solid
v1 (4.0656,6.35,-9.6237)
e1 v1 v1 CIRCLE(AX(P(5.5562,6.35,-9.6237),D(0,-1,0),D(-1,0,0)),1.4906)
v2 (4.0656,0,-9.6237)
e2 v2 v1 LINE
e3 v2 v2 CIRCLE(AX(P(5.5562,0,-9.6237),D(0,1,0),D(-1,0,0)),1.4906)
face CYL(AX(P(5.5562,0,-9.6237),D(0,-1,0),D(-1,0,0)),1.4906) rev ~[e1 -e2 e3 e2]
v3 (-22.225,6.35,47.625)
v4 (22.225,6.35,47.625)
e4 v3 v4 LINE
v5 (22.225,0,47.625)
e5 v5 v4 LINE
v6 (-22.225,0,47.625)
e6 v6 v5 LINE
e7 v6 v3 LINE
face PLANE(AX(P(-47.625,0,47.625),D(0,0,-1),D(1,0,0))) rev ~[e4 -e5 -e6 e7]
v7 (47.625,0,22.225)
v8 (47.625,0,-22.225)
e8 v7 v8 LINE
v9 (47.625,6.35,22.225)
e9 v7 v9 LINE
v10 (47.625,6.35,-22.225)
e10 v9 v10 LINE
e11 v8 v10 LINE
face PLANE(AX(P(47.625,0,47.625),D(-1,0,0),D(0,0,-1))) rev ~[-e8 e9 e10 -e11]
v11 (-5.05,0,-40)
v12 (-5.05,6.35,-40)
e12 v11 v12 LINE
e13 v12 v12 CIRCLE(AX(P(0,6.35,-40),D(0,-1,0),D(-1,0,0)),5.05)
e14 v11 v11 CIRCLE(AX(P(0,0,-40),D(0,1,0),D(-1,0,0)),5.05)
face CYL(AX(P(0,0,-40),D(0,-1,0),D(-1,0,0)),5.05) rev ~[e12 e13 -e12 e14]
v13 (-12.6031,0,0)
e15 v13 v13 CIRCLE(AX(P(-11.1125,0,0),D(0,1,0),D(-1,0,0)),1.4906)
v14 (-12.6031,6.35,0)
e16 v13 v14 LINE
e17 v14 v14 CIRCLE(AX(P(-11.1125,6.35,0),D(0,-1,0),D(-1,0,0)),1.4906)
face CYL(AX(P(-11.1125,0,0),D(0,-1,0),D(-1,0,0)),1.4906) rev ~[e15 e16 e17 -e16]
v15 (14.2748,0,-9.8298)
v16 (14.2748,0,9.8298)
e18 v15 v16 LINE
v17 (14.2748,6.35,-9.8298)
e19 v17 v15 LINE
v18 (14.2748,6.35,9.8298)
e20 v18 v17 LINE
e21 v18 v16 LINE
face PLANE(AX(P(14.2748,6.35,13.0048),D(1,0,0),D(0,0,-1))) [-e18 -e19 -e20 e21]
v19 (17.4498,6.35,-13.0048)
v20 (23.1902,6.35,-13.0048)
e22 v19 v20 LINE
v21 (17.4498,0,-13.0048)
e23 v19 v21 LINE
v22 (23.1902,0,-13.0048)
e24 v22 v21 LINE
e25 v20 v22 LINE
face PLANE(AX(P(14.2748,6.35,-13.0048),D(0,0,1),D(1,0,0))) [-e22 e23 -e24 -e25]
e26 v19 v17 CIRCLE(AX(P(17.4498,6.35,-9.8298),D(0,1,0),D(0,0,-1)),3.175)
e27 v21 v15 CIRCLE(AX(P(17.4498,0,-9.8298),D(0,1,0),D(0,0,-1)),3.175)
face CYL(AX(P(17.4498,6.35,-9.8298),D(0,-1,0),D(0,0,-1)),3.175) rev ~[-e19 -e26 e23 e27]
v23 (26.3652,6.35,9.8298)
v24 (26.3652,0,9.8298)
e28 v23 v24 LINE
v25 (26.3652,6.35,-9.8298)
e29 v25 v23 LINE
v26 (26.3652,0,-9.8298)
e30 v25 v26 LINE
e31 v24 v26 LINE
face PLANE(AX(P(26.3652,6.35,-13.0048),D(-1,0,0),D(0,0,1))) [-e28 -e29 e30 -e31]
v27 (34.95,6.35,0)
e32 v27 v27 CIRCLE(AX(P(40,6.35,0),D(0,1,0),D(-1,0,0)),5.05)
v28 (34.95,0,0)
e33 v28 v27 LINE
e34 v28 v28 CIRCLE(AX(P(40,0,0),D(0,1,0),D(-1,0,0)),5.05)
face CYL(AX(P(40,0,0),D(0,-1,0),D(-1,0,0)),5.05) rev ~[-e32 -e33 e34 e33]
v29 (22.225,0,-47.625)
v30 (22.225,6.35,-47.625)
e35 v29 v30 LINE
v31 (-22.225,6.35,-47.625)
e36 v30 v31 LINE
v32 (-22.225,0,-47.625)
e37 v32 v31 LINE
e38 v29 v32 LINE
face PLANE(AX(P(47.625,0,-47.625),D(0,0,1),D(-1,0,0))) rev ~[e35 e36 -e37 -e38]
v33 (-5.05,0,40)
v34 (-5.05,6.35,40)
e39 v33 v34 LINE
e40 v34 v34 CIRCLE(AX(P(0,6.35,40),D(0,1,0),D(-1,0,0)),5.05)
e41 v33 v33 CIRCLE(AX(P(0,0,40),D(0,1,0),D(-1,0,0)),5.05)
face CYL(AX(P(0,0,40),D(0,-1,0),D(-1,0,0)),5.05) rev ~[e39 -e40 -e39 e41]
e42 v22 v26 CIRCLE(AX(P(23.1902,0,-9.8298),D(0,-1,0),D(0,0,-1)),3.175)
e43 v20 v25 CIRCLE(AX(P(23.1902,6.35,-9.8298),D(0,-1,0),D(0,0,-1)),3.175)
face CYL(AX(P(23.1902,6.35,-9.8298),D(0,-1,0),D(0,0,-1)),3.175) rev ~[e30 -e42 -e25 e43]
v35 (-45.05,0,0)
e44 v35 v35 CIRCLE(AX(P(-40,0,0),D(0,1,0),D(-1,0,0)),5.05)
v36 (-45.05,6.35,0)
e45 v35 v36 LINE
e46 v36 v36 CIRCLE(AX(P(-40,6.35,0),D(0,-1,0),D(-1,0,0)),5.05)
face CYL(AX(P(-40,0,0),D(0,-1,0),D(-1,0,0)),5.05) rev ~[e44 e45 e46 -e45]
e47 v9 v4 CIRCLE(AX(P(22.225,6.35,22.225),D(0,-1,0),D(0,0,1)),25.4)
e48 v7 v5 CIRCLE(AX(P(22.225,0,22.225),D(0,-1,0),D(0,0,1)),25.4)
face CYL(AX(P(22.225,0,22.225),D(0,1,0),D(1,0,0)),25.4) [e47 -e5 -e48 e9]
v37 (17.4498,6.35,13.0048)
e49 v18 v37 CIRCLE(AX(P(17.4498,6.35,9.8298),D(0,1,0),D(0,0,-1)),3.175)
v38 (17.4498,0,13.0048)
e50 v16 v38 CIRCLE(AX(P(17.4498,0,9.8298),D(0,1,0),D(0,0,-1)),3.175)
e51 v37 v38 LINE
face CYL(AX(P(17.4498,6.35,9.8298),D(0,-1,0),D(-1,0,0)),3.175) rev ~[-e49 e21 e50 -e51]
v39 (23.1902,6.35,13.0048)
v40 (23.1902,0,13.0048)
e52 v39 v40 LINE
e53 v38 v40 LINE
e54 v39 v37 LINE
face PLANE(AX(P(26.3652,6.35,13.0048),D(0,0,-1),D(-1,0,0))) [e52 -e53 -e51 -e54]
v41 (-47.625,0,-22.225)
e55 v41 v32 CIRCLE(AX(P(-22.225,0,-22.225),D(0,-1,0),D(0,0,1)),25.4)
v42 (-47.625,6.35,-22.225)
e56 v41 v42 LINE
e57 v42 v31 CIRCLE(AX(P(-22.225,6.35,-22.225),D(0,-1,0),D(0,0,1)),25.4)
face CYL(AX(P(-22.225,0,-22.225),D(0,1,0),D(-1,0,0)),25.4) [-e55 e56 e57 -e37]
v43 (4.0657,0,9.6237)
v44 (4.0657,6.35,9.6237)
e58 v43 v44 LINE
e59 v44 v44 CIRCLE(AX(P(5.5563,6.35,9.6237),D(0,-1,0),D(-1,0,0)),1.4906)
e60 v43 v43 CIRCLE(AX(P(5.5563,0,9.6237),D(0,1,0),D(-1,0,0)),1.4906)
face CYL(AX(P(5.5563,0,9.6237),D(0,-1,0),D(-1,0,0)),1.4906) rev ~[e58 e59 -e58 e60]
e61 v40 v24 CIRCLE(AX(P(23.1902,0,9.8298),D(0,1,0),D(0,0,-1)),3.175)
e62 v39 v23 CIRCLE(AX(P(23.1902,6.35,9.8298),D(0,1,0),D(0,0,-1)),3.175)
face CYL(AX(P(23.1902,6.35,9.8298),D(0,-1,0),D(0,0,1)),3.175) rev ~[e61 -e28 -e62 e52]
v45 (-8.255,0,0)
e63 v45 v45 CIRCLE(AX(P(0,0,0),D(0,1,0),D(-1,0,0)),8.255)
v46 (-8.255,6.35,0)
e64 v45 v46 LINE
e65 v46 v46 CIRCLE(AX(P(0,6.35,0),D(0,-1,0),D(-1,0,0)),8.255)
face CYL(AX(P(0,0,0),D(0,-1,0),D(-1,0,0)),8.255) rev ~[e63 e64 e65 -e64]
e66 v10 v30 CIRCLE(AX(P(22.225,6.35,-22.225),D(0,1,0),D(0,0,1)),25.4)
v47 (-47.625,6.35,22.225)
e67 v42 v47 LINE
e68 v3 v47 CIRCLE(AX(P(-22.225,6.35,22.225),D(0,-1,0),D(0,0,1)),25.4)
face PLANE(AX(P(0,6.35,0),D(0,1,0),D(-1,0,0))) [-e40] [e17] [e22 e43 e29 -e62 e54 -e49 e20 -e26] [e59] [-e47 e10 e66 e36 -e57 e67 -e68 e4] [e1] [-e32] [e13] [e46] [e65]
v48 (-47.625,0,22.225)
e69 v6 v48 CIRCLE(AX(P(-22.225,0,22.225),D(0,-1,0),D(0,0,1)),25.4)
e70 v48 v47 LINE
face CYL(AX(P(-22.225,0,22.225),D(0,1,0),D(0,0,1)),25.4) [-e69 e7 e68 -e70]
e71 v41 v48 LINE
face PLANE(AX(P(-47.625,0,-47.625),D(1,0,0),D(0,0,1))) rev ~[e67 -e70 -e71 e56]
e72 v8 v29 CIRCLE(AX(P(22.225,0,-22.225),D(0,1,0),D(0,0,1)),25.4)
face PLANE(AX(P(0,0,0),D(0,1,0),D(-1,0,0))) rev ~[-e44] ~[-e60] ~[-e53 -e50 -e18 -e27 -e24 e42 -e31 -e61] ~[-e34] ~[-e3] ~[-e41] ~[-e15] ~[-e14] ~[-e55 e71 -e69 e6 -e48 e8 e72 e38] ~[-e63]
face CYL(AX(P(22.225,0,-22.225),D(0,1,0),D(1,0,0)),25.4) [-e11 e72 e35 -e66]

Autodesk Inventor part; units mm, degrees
ref_plane "YZ Plane" through (0, 0, 0) normal (1, 0, 0) x (0, 1, 0)
ref_plane "XZ Plane" through (0, 0, 0) normal (0, 1, 0) x (-1, 0, 0)
ref_plane "XY Plane" through (0, 0, 0) normal (0, 0, 1) x (1, 0, 0)
sketch "Sketch3" plane through (0, 0, 0) normal (0, 1, 0) x (-1, 0, 0)
  circle A0 centre (11.1125, 0) radius 1.4906
  circle A1 centre (-5.5563, 9.6237) radius 1.4906
  circle A2 centre (-5.5562, -9.6237) radius 1.4906
  circle A3 centre (0, 0) radius 8.255
  line L0 (0, 0) -> (11.1125, 0)
  line L1 (0, 0) -> (-5.5563, 9.6237)
  line L2 (0, 0) -> (-5.5562, -9.6237)
  line L3 (0, 11.7306) -> (0, -34.9786)
  line L4 (38.6398, 0) -> (-3.2951, 0)
  circle A4 centre (40, 0) radius 5.05
  circle A5 centre (0, -40) radius 5.05
  circle A6 centre (0, 40) radius 5.05
  circle A7 centre (-40, 0) radius 5.05
  line L5 (-47.625, -47.625) -> (47.625, -47.625)
  line L6 (47.625, -47.625) -> (47.625, 47.625)
  line L7 (47.625, 47.625) -> (-47.625, 47.625)
  line L8 (-47.625, 47.625) -> (-47.625, -47.625)
  line L9 (-47.625, -47.625) -> (47.625, 47.625) construction
  line L10 (47.625, -47.625) -> (-47.625, 47.625) construction
  dimension "d19" = 120
  dimension "d20" = 120
  dimension "d21" = 11.1125
  dimension "d22" = 11.1125
  dimension "d23" = 11.1125
  dimension "d24" = 2.9811
  dimension "d25" = 2.9811
  dimension "d26" = 2.9811
  dimension "d27" = 80
  dimension "d28" = 80
  dimension "d29" = 10.1
  dimension "d30" = 10.1
  dimension "d31" = 95.25
  dimension "d32" = 95.25
  dimension "d36" = 16.51
extrude "Extrusion6" add sketch "Sketch3" along normal blind 6.35
fillet "Fillet1" radius 25.4 4 edges at (-47.625, 3.175, 47.625) (47.625, 3.175, 47.625) (47.625, 3.175, -47.625) (-47.625, 3.175, -47.625)
sketch "Sketch4" plane through (0, 6.35, 0) normal (0, 1, 0) x (1, 0, 0)
  line L0 (14.2748, 13.0048) -> (26.3652, 13.0048)
  line L1 (26.3652, 13.0048) -> (26.3652, -13.0048)
  line L2 (26.3652, -13.0048) -> (14.2748, -13.0048)
  line L3 (14.2748, -13.0048) -> (14.2748, 13.0048)
  line L4 (0, 0) -> (20.32, 0) construction
  point P0 (-11.2012, 0)
  point P1 (16.8026, 0)
  point P2 (26.3652, 0)
  point P3 (20.32, 13.0048)
  dimension "d39" = 12.0904
  dimension "d40" = 26.0096
  dimension "d41" = 20.32
extrude "Extrusion7" cut sketch "Sketch4" against normal up to next
fillet "Fillet2" radius 3.175 4 edges at (14.2748, 3.175, -13.0048) (14.2748, 3.175, 13.0048) (26.3652, 3.175, -13.0048) (26.3652, 3.175, 13.0048)
equation "\"d22\" = d21"
equation "\"d23\" = d21"
equation "\"d25\" = d24"
equation "\"d26\" = d24"
equation "\"d28\" = d27"
equation "\"d30\" = d29"
equation "\"d32\" = d31"
properties part number "Vertical_Lead_Screw_Plate_With_E-Stop"
